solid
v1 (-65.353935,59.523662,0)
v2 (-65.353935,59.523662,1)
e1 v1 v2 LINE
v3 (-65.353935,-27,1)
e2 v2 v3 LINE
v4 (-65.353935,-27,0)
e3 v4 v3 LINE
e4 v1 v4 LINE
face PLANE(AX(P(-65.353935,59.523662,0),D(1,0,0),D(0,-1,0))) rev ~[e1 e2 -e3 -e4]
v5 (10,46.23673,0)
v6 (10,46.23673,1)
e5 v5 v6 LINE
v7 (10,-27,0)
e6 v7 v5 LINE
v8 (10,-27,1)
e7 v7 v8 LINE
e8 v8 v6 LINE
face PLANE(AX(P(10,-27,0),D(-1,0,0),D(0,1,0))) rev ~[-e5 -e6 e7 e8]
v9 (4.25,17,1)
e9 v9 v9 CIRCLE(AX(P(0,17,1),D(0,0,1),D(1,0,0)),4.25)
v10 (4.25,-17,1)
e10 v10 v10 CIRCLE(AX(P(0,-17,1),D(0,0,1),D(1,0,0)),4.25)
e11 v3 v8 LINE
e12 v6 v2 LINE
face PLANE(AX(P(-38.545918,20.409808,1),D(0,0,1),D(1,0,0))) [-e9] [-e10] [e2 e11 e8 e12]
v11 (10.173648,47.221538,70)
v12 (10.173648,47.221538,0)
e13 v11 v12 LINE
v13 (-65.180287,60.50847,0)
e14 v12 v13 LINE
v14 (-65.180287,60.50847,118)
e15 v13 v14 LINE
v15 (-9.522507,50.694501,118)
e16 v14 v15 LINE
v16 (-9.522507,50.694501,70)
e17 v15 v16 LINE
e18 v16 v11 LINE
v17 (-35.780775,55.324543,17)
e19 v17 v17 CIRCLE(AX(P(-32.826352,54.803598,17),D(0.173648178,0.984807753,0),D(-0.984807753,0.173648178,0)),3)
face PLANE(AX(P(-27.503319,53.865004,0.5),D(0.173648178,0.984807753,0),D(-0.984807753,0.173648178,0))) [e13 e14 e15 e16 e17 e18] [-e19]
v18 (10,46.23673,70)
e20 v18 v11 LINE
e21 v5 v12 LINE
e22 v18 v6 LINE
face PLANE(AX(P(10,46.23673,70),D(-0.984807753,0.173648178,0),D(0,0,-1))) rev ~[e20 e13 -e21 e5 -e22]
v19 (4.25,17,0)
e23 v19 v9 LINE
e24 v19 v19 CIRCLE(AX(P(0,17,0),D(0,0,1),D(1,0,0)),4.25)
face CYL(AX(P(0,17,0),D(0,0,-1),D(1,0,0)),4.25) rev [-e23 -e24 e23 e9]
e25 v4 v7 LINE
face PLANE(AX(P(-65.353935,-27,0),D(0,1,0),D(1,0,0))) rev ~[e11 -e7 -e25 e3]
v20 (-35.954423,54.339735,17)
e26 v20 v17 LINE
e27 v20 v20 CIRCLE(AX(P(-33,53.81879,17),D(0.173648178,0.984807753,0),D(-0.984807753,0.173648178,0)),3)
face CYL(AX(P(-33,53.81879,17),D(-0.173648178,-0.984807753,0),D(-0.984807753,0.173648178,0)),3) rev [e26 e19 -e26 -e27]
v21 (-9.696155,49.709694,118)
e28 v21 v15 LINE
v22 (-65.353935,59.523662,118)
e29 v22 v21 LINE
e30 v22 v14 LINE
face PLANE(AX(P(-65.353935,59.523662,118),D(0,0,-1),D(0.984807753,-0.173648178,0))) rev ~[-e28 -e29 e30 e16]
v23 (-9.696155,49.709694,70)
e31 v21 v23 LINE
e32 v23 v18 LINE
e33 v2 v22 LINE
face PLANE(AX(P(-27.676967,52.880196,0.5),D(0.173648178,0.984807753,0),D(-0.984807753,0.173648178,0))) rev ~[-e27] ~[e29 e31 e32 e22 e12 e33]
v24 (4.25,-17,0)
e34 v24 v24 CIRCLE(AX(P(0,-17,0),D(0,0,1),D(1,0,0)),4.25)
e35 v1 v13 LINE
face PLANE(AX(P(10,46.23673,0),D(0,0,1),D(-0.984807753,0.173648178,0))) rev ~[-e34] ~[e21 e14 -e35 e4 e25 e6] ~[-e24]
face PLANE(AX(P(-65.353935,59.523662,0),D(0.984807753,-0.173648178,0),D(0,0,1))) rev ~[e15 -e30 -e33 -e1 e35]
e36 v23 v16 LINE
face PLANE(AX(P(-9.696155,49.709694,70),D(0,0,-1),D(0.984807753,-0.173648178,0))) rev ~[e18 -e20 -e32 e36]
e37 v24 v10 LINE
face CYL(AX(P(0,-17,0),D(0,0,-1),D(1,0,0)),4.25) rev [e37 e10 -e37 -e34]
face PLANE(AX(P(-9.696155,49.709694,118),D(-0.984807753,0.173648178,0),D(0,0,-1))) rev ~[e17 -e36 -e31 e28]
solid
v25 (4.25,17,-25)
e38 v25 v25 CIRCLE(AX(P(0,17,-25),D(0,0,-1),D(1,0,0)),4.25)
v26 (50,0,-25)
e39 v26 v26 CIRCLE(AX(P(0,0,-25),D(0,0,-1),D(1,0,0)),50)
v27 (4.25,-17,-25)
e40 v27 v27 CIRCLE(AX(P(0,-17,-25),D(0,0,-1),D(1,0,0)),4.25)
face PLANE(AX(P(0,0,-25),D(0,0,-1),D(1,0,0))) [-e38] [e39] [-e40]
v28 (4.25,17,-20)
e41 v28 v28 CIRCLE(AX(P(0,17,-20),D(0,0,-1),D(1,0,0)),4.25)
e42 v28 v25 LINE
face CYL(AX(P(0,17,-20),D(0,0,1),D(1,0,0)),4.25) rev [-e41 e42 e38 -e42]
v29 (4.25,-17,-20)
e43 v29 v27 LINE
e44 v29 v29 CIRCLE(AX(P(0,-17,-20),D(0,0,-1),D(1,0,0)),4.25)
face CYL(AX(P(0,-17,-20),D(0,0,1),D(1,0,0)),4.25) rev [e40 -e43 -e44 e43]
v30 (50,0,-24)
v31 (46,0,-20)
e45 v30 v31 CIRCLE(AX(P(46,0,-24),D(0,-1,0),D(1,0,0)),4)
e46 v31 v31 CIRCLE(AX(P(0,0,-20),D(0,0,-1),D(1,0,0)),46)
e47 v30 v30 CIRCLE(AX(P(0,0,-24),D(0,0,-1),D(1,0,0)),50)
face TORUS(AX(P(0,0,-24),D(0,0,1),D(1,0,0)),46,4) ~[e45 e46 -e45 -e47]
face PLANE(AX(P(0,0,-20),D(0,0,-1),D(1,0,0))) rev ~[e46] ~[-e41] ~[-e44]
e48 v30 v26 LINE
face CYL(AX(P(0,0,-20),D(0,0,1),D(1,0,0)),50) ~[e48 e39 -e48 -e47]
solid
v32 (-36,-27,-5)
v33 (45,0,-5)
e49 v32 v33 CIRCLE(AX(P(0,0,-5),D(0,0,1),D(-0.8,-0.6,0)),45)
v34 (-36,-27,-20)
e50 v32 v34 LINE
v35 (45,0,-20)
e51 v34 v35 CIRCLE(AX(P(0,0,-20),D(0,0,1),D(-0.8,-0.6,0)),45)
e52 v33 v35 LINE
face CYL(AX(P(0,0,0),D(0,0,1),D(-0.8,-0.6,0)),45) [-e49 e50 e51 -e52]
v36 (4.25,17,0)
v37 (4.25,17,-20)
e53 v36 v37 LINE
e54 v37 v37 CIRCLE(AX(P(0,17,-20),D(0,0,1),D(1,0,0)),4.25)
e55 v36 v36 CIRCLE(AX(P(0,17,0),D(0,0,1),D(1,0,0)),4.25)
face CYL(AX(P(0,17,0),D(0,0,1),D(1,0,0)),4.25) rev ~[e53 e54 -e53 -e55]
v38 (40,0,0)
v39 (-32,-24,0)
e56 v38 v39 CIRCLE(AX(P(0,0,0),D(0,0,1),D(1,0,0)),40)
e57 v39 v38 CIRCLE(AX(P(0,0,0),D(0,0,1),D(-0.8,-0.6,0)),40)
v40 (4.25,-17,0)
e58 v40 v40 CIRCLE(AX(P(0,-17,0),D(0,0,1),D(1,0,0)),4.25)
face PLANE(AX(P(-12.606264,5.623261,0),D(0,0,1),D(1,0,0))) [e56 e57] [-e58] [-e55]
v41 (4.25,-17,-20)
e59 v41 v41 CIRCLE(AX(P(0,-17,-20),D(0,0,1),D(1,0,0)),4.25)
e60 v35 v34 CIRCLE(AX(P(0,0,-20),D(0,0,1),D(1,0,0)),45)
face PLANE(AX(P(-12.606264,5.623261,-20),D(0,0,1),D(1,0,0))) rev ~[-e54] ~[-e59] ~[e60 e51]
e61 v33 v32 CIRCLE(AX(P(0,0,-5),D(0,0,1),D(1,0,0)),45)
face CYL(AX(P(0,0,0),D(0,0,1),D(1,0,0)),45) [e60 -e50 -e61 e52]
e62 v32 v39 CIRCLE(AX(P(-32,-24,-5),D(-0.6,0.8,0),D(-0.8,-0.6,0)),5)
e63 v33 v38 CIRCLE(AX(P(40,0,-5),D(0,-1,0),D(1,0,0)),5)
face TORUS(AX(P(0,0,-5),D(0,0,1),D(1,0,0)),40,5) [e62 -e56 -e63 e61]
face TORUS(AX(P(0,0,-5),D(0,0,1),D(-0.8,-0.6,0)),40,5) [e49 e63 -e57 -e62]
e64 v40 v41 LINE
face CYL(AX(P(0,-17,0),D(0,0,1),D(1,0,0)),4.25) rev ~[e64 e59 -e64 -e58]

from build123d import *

# Parameters (mm, degrees)
F0_R     = 4.25
F1_DEPTH = 20
F2_R     = 5
F3_R     = 50
F3_R_2   = 45
F3_R_3   = 4.25
F4_DEPTH = 5
F5_R     = 4
F6_R     = 4.25
F7_DEPTH = 1
F8_W     = 76.5163908218
F8_H     = 1
F8_R     = 3
F9_DEPTH = 1


# Not quite as in the source:
# - a feature names something its author has since deleted; it is built from what else it names


with BuildPart() as f1:
    # F0 (on Top) → F1 (new body)
    with BuildSketch(Plane.XY):
        with BuildLine():
            Line((10, -27), (10, 43.874821937))
            ThreePointArc((10, 43.874821937), (-37.7466567546, 24.4987735173), (-36, -27))
            Line((-36, -27), (10, -27))
        make_face()
        with Locations((0, -17)):
            Circle(F0_R, mode=Mode.SUBTRACT)
        with Locations((0, 17)):
            Circle(F0_R, mode=Mode.SUBTRACT)
        with BuildLine():
            ThreePointArc((-36, -27), (14.2302494708, -42.6907484123), (45, 0))
            ThreePointArc((45, 0), (35.1781181987, 28.0624304008), (10, 43.874821937))
            Line((10, 43.874821937), (10, -27))
            Line((10, -27), (-36, -27))
        make_face()
    extrude(amount=-F1_DEPTH)

    # F2
    f2_edges = [f1.edges().sort_by_distance(p)[0] for p in [
        (-10, -43.874822, 0),
    ]]
    fillet(f2_edges, radius=F2_R)


with BuildPart() as f4:
    # F3 (on face) → F4 (new body)
    with BuildSketch(Plane(origin=(0, 0, -20), x_dir=(1, 0, 0), z_dir=(0, 0, -1))):
        Circle(F3_R)
        Circle(F3_R_2, mode=Mode.SUBTRACT)
        Circle(F3_R_2)
        with Locations((0, -17)):
            Circle(F3_R_3, mode=Mode.SUBTRACT)
        with Locations((0, 17)):
            Circle(F3_R_3, mode=Mode.SUBTRACT)
    extrude(amount=F4_DEPTH)

    # F5
    f5_edges = [f4.edges().sort_by_distance(p)[0] for p in [
        (-50, 0, -20),
    ]]
    fillet(f5_edges, radius=F5_R)


with BuildPart() as f7:
    # F6 (on face) → F7 (new body)
    with BuildSketch(Plane.XY):
        with BuildLine():
            Line((10, 46.2367301929), (-65.3539349139, 59.5236620208))
            Line((-65.3539349139, 59.5236620208), (-65.3539349139, -27))
            Line((-65.3539349139, -27), (-29.5127091267, -27))
            ThreePointArc((-29.5127091267, -27), (-34.2824912471, 20.6085126561), (10, 38.7298334621))
            Line((10, 38.7298334621), (10, 46.2367301929))
        make_face()
        with BuildLine():
            ThreePointArc((10, 38.7298334621), (-34.2824912471, 20.6085126561), (-29.5127091267, -27))
            Line((-29.5127091267, -27), (10, -27))
            Line((10, -27), (10, 38.7298334621))
        make_face()
        with Locations((0, -17)):
            Circle(F6_R, mode=Mode.SUBTRACT)
        with Locations((0, 17)):
            Circle(F6_R, mode=Mode.SUBTRACT)
    extrude(amount=F7_DEPTH)

    # F8 (on face) → F9 (join)
    with BuildSketch(Plane(origin=(8.2084834398, 46.5526228989, 0), x_dir=(-0.984807753, 0.1736481777, 0), z_dir=(0.1736481777, 0.984807753, 0))):
        with Locations((36.4390418201, 0.5)):
            Rectangle(F8_W, F8_H)
        Polygon((-1.8191535908, 70), (-1.8191535908, 1), (74.697237231, 1), (74.697237231, 118), (18.1808464092, 118), (18.1808464092, 70), align=None)
        with Locations((41.8441907202, 17)):
            Circle(F8_R, mode=Mode.SUBTRACT)
    extrude(amount=F9_DEPTH)


solid = Compound([f1.part, f4.part, f7.part])
